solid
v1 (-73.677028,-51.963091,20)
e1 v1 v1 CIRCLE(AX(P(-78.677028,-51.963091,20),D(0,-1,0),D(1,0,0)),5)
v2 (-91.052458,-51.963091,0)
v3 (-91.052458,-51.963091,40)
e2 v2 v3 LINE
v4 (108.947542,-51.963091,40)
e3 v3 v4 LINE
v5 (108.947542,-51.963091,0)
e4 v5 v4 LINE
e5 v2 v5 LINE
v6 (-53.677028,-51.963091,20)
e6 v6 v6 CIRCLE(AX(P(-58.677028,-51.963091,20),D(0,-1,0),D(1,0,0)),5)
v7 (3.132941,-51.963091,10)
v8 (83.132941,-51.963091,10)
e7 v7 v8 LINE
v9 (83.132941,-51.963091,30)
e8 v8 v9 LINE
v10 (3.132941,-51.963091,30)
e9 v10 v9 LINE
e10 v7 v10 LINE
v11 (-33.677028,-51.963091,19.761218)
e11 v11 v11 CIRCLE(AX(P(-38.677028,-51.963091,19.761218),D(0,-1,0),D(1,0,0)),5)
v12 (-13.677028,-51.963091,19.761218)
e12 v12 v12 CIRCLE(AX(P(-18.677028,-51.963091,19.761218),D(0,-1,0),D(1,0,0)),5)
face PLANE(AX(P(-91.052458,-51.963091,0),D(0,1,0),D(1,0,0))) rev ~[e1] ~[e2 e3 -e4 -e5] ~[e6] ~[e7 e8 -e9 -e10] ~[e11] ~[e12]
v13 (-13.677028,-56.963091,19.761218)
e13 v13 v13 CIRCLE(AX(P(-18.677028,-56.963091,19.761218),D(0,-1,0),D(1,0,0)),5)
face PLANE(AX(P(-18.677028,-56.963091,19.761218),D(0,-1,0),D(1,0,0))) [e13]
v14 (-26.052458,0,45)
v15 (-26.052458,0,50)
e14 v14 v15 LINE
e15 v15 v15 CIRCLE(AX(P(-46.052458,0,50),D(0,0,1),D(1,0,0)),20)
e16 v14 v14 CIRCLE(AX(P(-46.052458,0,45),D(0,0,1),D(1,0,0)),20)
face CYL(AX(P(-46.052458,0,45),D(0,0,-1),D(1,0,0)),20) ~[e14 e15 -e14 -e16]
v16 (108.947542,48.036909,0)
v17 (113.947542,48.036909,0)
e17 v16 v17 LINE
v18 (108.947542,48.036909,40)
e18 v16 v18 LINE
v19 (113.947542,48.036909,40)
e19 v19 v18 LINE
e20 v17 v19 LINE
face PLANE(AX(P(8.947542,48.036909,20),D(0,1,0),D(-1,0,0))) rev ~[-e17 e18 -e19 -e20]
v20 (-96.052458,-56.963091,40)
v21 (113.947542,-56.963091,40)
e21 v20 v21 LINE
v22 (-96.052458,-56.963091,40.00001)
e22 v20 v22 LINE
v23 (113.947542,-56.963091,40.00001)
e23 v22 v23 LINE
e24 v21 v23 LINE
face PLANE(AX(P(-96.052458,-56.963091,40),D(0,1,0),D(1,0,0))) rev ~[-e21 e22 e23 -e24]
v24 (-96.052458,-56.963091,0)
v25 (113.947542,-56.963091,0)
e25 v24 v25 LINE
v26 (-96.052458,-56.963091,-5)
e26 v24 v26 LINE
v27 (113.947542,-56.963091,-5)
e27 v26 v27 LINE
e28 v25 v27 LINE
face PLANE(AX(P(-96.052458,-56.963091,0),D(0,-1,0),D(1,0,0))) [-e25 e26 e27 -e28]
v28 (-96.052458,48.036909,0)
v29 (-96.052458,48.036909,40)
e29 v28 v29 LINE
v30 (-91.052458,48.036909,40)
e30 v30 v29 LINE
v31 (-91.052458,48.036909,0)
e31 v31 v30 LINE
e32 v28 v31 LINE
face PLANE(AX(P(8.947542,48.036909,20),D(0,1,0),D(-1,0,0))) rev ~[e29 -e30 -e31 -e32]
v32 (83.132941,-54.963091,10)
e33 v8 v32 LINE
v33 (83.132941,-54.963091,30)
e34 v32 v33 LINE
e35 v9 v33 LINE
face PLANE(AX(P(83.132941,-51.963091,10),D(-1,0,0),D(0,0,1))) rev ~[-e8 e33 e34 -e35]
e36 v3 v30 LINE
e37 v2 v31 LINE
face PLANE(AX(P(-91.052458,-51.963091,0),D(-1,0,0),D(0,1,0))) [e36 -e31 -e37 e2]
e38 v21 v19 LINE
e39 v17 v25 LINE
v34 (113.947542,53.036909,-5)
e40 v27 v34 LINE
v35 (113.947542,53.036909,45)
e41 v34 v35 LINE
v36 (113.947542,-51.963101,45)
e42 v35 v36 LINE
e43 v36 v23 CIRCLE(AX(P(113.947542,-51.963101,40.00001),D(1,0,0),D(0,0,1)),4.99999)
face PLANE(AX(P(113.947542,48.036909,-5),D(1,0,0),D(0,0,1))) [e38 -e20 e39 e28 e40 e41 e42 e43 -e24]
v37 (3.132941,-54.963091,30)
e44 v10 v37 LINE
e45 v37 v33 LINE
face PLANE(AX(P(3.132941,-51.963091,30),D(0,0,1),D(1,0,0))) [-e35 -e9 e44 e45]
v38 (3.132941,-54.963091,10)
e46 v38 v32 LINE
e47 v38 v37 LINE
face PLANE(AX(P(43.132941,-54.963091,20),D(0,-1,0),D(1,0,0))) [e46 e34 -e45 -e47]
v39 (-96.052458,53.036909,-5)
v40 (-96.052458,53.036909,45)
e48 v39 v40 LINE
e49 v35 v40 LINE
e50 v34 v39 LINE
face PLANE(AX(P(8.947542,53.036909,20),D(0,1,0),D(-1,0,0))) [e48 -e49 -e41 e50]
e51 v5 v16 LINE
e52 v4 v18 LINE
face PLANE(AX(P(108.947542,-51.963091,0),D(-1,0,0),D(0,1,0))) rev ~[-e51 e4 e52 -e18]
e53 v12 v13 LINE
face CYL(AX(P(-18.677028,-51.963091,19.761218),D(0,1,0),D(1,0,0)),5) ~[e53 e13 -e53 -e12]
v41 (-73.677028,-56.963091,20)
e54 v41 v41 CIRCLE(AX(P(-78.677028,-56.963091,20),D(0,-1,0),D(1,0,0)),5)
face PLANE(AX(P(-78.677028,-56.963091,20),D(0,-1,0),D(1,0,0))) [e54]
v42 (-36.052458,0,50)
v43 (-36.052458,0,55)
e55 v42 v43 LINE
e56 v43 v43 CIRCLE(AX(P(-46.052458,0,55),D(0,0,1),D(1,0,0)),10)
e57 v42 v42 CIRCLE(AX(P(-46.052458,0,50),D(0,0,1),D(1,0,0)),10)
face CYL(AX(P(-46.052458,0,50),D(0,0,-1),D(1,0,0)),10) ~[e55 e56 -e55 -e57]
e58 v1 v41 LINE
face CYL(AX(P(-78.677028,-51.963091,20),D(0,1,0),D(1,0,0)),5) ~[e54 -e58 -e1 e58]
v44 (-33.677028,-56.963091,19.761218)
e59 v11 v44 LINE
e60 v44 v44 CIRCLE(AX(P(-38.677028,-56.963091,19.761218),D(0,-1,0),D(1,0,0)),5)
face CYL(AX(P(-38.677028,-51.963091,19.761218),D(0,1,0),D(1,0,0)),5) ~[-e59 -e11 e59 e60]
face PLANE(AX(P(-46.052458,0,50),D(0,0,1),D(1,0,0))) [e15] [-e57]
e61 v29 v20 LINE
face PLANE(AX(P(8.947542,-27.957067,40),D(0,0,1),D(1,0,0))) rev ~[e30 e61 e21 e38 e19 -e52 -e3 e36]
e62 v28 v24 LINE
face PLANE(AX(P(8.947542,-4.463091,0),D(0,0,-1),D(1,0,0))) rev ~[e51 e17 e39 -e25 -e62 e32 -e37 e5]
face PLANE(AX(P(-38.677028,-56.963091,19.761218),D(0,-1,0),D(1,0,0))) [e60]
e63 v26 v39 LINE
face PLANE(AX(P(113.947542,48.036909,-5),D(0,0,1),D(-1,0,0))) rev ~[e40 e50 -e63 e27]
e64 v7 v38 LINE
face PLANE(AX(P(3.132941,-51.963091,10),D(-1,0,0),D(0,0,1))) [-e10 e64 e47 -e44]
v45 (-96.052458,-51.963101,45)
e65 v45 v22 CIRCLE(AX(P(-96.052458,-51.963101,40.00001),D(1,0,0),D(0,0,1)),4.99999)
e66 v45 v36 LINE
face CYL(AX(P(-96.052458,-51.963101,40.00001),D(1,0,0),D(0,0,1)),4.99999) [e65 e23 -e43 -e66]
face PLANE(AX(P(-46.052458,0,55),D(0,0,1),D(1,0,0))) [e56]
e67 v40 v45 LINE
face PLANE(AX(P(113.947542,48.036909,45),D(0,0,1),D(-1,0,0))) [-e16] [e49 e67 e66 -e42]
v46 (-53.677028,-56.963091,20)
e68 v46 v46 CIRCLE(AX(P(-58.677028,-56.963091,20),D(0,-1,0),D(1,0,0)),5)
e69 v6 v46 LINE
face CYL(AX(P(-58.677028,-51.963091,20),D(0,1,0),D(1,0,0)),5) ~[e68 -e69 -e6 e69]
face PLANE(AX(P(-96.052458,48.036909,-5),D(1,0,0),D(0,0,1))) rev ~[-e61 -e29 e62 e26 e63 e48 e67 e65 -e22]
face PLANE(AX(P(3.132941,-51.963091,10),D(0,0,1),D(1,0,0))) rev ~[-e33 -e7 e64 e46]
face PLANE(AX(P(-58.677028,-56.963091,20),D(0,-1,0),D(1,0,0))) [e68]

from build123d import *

# Parameters (mm, degrees)
F0_W      = 200
F0_H      = 100
F1_DEPTH  = 40
F2_W      = 210
F2_H      = 105
F2_W_2    = 200
F2_H_2    = 100
F3_DEPTH  = 5
F4_W      = 210
F4_H      = 105
F5_DEPTH  = 5
F6_W      = 210
F6_H      = 50
F7_DEPTH  = 5
F8_R      = 20
F9_DEPTH  = 5
F10_R     = 10
F11_DEPTH = 5
F12_R     = 5
F13_DEPTH = 5
F14_DEPTH = 5
F15_DEPTH = 5
F16_DEPTH = 5
F12_W     = 80
F12_H     = 20
F17_DEPTH = 3
F18_R     = 4.99999


# Not quite as in the source:
# - a fillet or chamfer is up to 0.001 mm smaller than in the source, because OpenCascade refuses the exact size


with BuildPart() as f1:
    # F0 (on Top) → F1 (new body)
    with BuildSketch(Plane.XY):
        with Locations((8.9475423098, -1.9630908966)):
            Rectangle(F0_W, F0_H)
    extrude(amount=F1_DEPTH)

    # F2 (on face) → F3 (join)
    with BuildSketch(Plane.XY.offset(40)):
        Polygon((113.9475423098, -56.9630908966), (113.9475423098, 48.0369091034), (108.9475423098, 48.0369091034), (108.9475423098, -51.9630908966), (-91.0524576902, -51.9630908966), (-91.0524576902, 48.0369091034), (-96.0524576902, 48.0369091034), (-96.0524576902, -56.9630908966), align=None)
        with Locations((8.9475423098, -4.4630908966)):
            Rectangle(F2_W, F2_H)
        with Locations((8.9475423098, -1.9630908966)):
            Rectangle(F2_W_2, F2_H_2)
    extrude(amount=F3_DEPTH)

    # F4 (on face) → F5 (join)
    with BuildSketch(Plane(origin=(0, 0, 0), x_dir=(1, 0, 0), z_dir=(0, 0, -1))):
        with Locations((8.9475423098, 4.4630908966)):
            Rectangle(F4_W, F4_H)
    extrude(amount=F5_DEPTH)

    # F6 (on face) → F7 (join)
    with BuildSketch(Plane(origin=(0, 48.0369091034, 0), x_dir=(-1, 0, 0), z_dir=(0, 1, 0))):
        with Locations((-8.9475423098, 20)):
            Rectangle(F6_W, F6_H)
    extrude(amount=F7_DEPTH)

    # F8 (on face) → F9 (join)
    with BuildSketch(Plane.XY.offset(45)):
        with Locations((-46.0524576902, 0)):
            Circle(F8_R)
    extrude(amount=F9_DEPTH)

    # F10 (on face) → F11 (join)
    with BuildSketch(Plane.XY.offset(50)):
        with Locations((-46.0524576902, 0)):
            Circle(F10_R)
    extrude(amount=F11_DEPTH)

    # F12 (on face) → F13 (join)
    with BuildSketch(Plane.XZ.offset(51.9630908966)):
        with Locations((-78.6770284176, 20)):
            Circle(F12_R)
    extrude(amount=F13_DEPTH)

    # F12 (on face) → F14 (join)
    with BuildSketch(Plane.XZ.offset(51.9630908966)):
        with Locations((-58.6770284176, 20)):
            Circle(F12_R)
    extrude(amount=F14_DEPTH)

    # F12 (on face) → F15 (join)
    with BuildSketch(Plane.XZ.offset(51.9630908966)):
        with Locations((-38.6770284176, 19.7612177581)):
            Circle(F12_R)
    extrude(amount=F15_DEPTH)

    # F12 (on face) → F16 (join)
    with BuildSketch(Plane.XZ.offset(51.9630908966)):
        with Locations((-18.6770284176, 19.7612177581)):
            Circle(F12_R)
    extrude(amount=F16_DEPTH)

    # F12 (on face) → F17 (join)
    with BuildSketch(Plane.XZ.offset(51.9630908966)):
        with Locations((43.1329405028, 20)):
            Rectangle(F12_W, F12_H)
    extrude(amount=F17_DEPTH)

    # F18 (radius 5 in the source; OpenCascade refuses exactly that, so slightly less here)
    f18_edges = [f1.edges().sort_by_distance(p)[0] for p in [
        (8.947542, -56.963091, 45),
    ]]
    fillet(f18_edges, radius=F18_R)


solid = f1.part
